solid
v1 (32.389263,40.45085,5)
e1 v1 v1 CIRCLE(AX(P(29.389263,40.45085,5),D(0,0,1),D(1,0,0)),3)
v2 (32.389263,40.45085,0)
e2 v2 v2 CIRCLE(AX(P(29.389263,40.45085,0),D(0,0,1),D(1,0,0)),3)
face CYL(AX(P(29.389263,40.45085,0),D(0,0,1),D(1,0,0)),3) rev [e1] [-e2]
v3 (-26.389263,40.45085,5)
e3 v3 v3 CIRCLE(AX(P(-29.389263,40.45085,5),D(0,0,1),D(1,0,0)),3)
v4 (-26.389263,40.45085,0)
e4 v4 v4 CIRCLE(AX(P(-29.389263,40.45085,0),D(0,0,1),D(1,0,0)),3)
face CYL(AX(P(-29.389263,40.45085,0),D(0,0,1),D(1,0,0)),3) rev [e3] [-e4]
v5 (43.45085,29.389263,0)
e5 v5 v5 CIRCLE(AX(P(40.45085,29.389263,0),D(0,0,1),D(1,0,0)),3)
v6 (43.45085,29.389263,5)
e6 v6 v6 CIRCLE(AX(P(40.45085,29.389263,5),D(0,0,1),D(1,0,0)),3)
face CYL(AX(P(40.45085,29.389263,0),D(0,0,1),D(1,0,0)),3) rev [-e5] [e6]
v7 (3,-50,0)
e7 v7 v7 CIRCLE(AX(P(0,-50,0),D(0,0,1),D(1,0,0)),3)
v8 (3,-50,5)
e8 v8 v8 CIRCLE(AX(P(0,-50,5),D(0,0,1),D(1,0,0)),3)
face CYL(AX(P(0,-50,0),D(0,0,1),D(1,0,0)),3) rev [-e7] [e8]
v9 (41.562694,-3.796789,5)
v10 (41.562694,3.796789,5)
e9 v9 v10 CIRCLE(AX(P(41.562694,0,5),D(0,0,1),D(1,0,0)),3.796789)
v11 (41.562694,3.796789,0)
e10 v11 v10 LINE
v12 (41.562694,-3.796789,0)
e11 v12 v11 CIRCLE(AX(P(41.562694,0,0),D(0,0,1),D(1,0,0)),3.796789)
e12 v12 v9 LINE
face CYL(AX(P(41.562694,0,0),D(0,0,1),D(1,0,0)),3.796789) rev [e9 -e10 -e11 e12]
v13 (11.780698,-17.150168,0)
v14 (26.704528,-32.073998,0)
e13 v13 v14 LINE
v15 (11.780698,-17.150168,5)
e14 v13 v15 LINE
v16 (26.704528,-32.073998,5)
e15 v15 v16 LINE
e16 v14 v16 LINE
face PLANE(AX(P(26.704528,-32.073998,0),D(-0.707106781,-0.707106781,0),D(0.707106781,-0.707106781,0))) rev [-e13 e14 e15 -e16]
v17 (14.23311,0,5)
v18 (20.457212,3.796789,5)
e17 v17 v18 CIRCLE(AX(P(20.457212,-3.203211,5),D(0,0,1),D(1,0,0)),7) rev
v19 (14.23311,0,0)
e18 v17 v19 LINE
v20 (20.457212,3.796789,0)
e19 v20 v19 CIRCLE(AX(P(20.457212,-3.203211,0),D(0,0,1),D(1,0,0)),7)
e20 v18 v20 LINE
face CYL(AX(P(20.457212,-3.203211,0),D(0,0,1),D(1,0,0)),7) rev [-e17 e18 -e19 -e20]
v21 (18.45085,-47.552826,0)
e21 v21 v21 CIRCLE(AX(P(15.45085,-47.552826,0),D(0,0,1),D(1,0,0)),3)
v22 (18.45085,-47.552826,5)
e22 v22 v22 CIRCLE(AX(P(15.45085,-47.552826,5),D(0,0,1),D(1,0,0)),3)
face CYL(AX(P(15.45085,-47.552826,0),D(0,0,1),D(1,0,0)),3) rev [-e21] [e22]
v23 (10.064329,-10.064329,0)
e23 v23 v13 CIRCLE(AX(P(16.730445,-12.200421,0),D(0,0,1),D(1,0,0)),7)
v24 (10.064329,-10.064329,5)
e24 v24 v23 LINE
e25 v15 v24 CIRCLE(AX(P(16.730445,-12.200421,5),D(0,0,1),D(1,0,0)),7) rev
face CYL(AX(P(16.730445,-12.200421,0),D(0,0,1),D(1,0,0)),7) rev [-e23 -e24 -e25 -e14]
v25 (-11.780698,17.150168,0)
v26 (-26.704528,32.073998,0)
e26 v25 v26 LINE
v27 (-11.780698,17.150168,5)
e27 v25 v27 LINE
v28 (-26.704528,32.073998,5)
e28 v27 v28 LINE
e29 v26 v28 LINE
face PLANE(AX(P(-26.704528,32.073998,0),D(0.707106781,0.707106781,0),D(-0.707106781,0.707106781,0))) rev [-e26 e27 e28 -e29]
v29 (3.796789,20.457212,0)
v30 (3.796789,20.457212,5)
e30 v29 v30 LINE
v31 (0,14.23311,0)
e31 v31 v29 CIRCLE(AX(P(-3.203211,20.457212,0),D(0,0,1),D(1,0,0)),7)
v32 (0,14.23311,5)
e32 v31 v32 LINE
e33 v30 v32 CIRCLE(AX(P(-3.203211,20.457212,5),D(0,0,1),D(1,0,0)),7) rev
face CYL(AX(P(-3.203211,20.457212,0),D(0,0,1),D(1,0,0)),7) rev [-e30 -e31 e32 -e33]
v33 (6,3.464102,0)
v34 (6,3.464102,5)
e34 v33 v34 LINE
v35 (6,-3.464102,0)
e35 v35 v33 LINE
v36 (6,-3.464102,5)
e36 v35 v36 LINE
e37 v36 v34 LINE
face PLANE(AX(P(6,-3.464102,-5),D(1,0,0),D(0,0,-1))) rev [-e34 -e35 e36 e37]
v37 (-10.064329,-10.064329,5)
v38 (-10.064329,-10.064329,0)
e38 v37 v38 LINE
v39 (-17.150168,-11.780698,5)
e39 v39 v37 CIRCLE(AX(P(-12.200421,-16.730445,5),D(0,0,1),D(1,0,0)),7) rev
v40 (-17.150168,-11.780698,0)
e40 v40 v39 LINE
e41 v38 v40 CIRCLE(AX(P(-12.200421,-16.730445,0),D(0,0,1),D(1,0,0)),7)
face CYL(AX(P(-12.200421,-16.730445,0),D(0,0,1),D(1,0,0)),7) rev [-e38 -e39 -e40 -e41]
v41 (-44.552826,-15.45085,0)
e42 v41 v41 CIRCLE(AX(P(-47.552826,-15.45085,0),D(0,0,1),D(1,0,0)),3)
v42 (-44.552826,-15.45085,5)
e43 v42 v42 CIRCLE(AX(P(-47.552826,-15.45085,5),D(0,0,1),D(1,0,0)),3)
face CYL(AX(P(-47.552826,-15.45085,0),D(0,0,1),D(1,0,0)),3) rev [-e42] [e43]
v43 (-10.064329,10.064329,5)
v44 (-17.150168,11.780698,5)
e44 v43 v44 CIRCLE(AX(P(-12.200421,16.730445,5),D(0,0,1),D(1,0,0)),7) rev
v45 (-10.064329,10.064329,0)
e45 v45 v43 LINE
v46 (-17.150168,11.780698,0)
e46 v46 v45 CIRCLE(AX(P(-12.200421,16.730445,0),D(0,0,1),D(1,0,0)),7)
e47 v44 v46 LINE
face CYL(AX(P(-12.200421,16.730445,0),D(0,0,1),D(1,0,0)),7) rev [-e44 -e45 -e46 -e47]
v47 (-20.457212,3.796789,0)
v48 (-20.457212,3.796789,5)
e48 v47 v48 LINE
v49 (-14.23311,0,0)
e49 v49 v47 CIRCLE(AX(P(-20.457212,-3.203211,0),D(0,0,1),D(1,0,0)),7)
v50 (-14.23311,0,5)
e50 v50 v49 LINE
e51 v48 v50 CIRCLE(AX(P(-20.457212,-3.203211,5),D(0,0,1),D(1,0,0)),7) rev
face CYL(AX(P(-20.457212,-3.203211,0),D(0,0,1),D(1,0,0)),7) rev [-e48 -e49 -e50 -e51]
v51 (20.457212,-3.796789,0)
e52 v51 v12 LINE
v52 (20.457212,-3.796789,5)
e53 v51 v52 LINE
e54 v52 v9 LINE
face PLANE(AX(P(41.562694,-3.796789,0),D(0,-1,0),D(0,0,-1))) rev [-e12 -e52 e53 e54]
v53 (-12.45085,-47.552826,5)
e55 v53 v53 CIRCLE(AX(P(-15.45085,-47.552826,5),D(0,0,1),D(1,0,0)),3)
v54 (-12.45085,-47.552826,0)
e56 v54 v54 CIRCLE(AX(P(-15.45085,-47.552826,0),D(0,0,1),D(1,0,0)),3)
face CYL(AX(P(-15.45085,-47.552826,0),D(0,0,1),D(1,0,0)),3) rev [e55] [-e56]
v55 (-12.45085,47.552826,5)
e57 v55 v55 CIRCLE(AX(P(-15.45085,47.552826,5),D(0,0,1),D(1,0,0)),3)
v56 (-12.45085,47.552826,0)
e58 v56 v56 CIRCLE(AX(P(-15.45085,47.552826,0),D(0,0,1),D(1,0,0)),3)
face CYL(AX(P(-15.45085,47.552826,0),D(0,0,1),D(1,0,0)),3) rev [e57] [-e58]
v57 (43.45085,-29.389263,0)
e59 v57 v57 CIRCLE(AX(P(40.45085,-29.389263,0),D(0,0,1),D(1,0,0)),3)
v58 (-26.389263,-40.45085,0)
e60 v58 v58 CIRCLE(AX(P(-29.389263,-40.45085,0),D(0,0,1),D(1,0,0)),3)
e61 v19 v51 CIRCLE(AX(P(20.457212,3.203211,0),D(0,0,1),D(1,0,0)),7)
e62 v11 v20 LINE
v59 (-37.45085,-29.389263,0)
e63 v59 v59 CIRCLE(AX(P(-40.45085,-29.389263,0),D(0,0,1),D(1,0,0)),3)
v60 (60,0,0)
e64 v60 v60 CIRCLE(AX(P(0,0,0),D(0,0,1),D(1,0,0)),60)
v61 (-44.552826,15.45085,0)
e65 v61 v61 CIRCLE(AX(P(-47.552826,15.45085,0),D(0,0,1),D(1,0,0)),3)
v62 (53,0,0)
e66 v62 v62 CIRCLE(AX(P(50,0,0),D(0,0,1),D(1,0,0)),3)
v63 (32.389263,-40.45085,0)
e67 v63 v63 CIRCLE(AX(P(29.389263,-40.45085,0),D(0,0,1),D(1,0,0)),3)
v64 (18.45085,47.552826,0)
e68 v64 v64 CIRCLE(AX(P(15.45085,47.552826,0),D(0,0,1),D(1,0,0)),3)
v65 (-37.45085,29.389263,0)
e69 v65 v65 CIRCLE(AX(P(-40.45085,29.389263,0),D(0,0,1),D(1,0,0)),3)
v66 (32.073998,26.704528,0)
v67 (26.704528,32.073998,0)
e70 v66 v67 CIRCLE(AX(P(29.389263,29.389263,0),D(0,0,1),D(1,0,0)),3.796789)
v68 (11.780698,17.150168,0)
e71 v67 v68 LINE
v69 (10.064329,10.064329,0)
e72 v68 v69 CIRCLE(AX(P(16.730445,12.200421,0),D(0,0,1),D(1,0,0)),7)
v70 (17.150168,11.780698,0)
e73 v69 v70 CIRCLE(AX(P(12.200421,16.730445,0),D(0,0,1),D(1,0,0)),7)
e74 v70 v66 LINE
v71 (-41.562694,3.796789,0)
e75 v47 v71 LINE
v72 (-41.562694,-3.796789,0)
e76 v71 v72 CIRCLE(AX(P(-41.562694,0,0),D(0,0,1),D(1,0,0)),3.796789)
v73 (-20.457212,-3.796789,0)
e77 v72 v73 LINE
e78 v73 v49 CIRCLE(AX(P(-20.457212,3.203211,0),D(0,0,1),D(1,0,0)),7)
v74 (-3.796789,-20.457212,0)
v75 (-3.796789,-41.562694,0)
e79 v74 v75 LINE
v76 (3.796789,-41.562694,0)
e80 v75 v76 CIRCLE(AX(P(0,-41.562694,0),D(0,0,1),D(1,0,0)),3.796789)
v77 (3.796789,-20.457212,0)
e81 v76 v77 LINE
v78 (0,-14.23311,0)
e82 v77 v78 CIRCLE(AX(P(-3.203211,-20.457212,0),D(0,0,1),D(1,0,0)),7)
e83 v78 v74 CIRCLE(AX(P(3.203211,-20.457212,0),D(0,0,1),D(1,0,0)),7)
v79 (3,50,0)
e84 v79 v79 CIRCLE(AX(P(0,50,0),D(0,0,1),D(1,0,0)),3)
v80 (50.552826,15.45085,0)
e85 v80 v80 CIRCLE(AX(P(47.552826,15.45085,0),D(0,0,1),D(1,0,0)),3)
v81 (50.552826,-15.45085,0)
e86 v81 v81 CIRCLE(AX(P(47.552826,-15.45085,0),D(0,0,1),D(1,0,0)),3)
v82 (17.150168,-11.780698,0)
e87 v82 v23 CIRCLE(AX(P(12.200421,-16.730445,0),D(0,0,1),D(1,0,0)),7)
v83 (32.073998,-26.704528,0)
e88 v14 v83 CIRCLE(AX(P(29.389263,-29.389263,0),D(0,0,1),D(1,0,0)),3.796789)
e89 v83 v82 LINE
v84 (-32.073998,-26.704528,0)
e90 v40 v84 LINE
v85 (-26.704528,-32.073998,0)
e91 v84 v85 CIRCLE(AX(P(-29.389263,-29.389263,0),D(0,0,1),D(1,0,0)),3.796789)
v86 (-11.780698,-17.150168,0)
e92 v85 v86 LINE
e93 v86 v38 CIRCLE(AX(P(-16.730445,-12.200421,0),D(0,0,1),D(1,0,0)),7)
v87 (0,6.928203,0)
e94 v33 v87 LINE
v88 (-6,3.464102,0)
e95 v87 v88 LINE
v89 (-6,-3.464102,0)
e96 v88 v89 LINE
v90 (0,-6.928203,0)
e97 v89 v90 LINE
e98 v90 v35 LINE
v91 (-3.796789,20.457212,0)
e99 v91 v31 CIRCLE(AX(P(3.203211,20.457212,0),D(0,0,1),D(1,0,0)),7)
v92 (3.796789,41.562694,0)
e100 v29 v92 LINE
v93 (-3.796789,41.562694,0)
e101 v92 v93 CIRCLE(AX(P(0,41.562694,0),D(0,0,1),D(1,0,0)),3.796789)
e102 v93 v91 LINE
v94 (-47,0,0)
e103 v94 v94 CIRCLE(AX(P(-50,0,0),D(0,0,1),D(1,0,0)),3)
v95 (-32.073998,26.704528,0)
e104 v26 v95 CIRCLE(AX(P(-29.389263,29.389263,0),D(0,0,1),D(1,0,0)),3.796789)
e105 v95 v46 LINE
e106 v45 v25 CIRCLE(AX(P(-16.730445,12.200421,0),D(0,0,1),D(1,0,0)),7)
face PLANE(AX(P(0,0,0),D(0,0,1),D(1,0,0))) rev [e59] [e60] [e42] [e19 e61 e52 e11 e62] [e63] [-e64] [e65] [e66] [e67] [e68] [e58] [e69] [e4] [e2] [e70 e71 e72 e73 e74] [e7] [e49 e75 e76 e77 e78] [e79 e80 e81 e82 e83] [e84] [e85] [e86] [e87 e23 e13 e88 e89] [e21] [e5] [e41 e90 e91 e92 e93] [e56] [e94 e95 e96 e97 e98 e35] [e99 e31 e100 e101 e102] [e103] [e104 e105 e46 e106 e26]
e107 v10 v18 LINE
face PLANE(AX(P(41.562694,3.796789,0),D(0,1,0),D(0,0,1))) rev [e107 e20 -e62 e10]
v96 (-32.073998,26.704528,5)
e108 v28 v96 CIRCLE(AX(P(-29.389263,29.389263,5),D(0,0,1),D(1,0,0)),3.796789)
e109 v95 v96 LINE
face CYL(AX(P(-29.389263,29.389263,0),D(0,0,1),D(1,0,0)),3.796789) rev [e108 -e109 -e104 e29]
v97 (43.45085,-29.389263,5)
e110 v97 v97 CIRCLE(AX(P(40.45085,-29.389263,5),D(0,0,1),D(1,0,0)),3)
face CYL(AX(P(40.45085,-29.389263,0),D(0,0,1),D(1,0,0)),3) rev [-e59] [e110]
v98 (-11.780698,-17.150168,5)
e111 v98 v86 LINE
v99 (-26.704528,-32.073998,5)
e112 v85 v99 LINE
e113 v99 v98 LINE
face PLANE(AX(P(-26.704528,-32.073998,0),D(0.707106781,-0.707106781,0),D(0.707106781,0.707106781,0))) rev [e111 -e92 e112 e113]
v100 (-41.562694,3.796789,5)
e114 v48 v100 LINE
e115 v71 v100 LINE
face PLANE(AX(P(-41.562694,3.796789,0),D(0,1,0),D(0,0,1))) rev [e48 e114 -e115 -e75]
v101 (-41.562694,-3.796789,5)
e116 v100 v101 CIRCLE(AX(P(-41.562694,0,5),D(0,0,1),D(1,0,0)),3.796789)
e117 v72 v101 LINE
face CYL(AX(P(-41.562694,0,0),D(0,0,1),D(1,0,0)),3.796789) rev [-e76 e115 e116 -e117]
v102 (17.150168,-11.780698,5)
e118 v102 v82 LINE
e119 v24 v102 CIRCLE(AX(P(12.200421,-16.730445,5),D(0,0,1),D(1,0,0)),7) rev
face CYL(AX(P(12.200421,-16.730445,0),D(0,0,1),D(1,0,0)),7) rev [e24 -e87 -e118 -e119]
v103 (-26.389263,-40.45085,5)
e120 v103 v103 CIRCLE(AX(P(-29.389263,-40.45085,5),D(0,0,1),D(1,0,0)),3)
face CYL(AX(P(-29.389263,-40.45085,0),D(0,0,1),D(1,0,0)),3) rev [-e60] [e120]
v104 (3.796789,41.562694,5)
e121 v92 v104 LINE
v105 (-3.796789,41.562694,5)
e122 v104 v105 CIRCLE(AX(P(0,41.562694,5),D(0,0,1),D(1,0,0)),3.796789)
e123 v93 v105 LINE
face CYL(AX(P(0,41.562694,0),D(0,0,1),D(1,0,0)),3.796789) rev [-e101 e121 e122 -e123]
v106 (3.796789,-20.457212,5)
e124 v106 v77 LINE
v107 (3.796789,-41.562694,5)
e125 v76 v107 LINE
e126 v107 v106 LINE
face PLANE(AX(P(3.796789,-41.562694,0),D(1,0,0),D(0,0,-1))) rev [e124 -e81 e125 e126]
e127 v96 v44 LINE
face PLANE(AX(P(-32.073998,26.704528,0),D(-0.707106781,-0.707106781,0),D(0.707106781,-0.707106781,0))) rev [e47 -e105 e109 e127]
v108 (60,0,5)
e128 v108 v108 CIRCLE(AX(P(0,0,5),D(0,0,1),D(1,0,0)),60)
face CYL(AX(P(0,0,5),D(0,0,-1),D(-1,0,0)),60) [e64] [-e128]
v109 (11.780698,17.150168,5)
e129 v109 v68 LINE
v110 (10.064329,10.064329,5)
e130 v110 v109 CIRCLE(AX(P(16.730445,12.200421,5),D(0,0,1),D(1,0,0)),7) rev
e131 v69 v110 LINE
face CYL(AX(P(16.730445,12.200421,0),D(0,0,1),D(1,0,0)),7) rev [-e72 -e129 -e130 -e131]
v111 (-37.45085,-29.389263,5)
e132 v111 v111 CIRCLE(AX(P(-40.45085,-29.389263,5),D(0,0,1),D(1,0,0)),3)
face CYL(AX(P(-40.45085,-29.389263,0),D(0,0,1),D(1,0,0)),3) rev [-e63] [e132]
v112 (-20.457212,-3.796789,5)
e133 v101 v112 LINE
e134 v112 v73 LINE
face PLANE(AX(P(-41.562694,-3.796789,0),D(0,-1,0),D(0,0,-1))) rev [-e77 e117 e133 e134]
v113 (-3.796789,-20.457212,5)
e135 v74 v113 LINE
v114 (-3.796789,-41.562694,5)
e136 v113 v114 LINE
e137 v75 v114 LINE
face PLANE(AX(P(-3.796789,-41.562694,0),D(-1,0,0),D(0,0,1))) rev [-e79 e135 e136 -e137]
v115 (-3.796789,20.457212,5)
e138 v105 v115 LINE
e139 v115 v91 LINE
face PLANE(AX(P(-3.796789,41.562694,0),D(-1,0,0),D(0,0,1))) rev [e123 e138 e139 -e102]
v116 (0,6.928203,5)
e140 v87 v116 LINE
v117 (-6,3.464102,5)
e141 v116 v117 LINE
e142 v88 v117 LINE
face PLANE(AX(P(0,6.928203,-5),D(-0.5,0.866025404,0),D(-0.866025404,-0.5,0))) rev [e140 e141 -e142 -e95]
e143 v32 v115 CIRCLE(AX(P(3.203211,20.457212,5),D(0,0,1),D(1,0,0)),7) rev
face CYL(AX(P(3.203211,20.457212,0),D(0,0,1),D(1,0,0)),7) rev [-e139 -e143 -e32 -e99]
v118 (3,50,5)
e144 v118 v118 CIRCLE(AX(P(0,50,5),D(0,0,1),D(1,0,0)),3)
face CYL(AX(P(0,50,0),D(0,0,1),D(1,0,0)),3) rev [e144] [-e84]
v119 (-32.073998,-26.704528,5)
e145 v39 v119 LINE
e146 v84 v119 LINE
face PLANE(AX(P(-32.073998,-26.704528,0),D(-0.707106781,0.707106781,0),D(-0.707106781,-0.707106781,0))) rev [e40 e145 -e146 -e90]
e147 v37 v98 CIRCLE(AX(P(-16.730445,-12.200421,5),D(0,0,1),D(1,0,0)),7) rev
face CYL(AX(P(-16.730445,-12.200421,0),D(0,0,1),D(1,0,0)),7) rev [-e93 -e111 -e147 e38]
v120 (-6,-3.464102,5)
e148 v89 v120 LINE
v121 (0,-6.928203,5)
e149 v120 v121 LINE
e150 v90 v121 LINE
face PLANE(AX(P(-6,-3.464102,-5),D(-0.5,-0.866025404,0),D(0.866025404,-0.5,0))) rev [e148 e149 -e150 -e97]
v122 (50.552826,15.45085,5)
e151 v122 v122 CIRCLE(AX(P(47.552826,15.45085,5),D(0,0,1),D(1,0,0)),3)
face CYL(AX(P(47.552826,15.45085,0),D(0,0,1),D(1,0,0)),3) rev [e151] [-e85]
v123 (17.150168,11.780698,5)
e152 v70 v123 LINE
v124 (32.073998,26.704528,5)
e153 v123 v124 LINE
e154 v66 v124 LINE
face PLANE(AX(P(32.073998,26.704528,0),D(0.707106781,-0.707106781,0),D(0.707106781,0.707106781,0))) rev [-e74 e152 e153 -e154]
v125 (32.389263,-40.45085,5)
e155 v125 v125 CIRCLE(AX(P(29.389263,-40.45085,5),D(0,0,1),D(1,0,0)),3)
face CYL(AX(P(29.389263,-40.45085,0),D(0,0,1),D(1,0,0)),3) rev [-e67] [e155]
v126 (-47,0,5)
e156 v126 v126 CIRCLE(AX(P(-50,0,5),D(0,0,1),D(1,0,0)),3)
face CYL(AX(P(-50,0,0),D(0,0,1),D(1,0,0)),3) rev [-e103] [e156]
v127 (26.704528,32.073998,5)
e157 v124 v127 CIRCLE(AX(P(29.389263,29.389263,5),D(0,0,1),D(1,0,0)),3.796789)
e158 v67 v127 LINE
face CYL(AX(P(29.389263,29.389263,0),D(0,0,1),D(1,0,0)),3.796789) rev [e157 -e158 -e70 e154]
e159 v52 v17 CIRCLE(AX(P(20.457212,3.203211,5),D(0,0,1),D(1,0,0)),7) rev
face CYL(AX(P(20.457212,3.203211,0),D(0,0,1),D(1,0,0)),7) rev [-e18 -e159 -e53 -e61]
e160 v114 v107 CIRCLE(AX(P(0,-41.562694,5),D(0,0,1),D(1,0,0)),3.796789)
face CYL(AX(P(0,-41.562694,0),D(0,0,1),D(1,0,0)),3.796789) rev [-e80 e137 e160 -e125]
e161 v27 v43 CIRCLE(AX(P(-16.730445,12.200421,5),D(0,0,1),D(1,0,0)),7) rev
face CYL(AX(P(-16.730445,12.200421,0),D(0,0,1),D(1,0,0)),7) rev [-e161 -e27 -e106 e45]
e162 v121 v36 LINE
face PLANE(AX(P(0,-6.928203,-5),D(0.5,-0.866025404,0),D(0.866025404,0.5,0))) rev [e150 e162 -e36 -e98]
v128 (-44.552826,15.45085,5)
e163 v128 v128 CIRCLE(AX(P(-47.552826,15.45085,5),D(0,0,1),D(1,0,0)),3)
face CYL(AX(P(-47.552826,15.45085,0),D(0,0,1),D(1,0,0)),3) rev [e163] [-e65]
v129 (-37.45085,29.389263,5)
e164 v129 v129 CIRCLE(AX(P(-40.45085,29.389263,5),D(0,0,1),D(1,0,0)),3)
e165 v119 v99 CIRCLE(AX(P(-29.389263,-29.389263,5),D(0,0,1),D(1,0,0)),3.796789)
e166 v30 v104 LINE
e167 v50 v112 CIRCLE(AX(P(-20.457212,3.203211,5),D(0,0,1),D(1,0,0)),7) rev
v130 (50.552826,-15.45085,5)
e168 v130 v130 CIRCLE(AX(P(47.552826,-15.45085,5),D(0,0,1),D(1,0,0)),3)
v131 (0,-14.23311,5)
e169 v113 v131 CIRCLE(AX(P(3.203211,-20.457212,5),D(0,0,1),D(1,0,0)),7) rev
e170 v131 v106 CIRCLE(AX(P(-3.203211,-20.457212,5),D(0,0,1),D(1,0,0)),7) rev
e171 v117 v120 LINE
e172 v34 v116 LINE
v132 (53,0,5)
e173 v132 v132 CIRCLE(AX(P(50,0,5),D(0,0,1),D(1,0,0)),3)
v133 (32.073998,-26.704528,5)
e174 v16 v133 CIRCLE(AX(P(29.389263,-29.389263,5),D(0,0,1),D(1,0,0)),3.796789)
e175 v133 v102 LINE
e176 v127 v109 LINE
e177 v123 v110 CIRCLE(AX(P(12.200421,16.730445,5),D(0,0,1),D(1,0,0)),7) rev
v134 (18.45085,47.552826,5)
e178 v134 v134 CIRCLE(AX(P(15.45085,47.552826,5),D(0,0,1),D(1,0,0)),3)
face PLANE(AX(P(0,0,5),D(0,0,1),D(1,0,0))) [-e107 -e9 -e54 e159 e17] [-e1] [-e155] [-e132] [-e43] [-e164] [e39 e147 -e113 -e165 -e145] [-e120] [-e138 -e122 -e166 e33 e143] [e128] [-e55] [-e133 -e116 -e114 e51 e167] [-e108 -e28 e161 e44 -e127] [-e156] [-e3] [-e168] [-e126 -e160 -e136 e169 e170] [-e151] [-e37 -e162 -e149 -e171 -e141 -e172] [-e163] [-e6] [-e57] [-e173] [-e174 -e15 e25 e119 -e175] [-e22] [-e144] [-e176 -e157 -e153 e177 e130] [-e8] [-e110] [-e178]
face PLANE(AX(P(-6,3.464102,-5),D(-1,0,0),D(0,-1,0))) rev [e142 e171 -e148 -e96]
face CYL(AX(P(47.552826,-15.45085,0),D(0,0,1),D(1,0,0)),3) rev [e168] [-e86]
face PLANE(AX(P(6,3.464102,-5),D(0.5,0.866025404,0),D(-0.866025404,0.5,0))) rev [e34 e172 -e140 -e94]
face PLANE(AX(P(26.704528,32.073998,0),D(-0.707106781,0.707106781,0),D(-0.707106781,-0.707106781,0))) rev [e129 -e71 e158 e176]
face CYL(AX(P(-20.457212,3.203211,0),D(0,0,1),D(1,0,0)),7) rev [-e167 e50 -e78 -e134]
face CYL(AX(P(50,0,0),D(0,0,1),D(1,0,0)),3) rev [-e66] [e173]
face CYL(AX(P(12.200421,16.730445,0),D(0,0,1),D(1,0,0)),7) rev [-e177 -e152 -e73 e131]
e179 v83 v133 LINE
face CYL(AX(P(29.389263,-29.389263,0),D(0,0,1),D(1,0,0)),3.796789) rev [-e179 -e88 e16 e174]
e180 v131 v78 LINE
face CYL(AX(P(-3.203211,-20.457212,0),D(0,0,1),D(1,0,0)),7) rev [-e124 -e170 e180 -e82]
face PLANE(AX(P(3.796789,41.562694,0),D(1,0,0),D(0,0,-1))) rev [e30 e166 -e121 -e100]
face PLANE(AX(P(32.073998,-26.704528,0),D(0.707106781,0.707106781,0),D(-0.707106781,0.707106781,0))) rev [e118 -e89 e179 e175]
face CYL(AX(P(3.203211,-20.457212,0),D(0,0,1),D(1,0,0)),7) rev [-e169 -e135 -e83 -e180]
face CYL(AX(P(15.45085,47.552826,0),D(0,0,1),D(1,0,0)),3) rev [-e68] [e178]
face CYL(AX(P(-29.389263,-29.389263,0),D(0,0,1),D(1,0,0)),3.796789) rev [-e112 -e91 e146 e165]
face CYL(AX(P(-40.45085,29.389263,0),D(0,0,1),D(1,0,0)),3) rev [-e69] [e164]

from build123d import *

# Parameters (mm, degrees)
SKETCH1_R           = 60
BOSS_EXTRUDE1_DEPTH = 5
SKETCH2_R           = 2
SKETCH2_R_2         = 3
CUT_EXTRUDE2_DEPTH  = 5
FILLET1_R           = 7
CUT_EXTRUDE3_DEPTH  = 10


with BuildPart() as part:
    # Sketch1 → Boss-Extrude1 (new body)
    with BuildSketch(Plane.XY):
        Circle(SKETCH1_R)
    extrude(amount=BOSS_EXTRUDE1_DEPTH)

    # Sketch2 → Cut-Extrude2 (cut)
    with BuildSketch(Plane.XY.offset(5)):
        Circle(SKETCH2_R)
        with Locations((0, 50)):
            Circle(SKETCH2_R_2)
        with Locations((15.450849719, 47.552825815)):
            Circle(SKETCH2_R_2)
        with Locations((29.389262615, 40.450849719)):
            Circle(SKETCH2_R_2)
        with Locations((40.450849719, 29.389262615)):
            Circle(SKETCH2_R_2)
        with Locations((47.552825815, 15.450849719)):
            Circle(SKETCH2_R_2)
        with Locations((50, 0)):
            Circle(SKETCH2_R_2)
        with Locations((47.552825815, -15.450849719)):
            Circle(SKETCH2_R_2)
        with Locations((40.450849719, -29.389262615)):
            Circle(SKETCH2_R_2)
        with Locations((29.389262615, -40.450849719)):
            Circle(SKETCH2_R_2)
        with Locations((15.450849719, -47.552825815)):
            Circle(SKETCH2_R_2)
        with Locations((0, -50)):
            Circle(SKETCH2_R_2)
        with Locations((-15.450849719, -47.552825815)):
            Circle(SKETCH2_R_2)
        with Locations((-29.389262615, -40.450849719)):
            Circle(SKETCH2_R_2)
        with Locations((-40.450849719, -29.389262615)):
            Circle(SKETCH2_R_2)
        with Locations((-47.552825815, -15.450849719)):
            Circle(SKETCH2_R_2)
        with Locations((-50, 0)):
            Circle(SKETCH2_R_2)
        with Locations((-47.552825815, 15.450849719)):
            Circle(SKETCH2_R_2)
        with Locations((-40.450849719, 29.389262615)):
            Circle(SKETCH2_R_2)
        with Locations((-29.389262615, 40.450849719)):
            Circle(SKETCH2_R_2)
        with Locations((-15.450849719, 47.552825815)):
            Circle(SKETCH2_R_2)
        with BuildLine():
            Line((-26.704527531, 32.073997698), (-6.627939737, 11.997409903))
            ThreePointArc((-6.627939737, 11.997409903), (-9.691940712, 9.691940712), (-11.997409903, 6.627939737))
            Line((-11.997409903, 6.627939737), (-32.073997698, 26.704527531))
            ThreePointArc((-32.073997698, 26.704527531), (-32.073997698, 32.073997698), (-26.704527531, 32.073997698))
        make_face()
        with BuildLine():
            Line((3.796788766, 41.562693778), (3.796788766, 13.170111032))
            ThreePointArc((3.796788766, 13.170111032), (0, 13.706474001), (-3.796788766, 13.170111032))
            Line((-3.796788766, 13.170111032), (-3.796788766, 41.562693778))
            ThreePointArc((-3.796788766, 41.562693778), (0, 45.359482544), (3.796788766, 41.562693778))
        make_face()
        with BuildLine():
            Line((32.073997698, 26.704527531), (11.997409903, 6.627939737))
            ThreePointArc((11.997409903, 6.627939737), (9.691940712, 9.691940712), (6.627939737, 11.997409903))
            Line((6.627939737, 11.997409903), (26.704527531, 32.073997698))
            ThreePointArc((26.704527531, 32.073997698), (32.073997698, 32.073997698), (32.073997698, 26.704527531))
        make_face()
        with BuildLine():
            Line((41.562693778, -3.796788766), (13.170111032, -3.796788766))
            ThreePointArc((13.170111032, -3.796788766), (13.706474001, 0), (13.170111032, 3.796788766))
            Line((13.170111032, 3.796788766), (41.562693778, 3.796788766))
            ThreePointArc((41.562693778, 3.796788766), (45.359482544, 0), (41.562693778, -3.796788766))
        make_face()
        with BuildLine():
            Line((26.704527531, -32.073997698), (6.627939737, -11.997409903))
            ThreePointArc((6.627939737, -11.997409903), (9.691940712, -9.691940712), (11.997409903, -6.627939737))
            Line((11.997409903, -6.627939737), (32.073997698, -26.704527531))
            ThreePointArc((32.073997698, -26.704527531), (32.073997698, -32.073997698), (26.704527531, -32.073997698))
        make_face()
        with BuildLine():
            Line((-3.796788766, -41.562693778), (-3.796788766, -13.170111032))
            ThreePointArc((-3.796788766, -13.170111032), (0, -13.706474001), (3.796788766, -13.170111032))
            Line((3.796788766, -13.170111032), (3.796788766, -41.562693778))
            ThreePointArc((3.796788766, -41.562693778), (0, -45.359482544), (-3.796788766, -41.562693778))
        make_face()
        with BuildLine():
            Line((-32.073997698, -26.704527531), (-11.997409903, -6.627939737))
            ThreePointArc((-11.997409903, -6.627939737), (-9.691940712, -9.691940712), (-6.627939737, -11.997409903))
            Line((-6.627939737, -11.997409903), (-26.704527531, -32.073997698))
            ThreePointArc((-26.704527531, -32.073997698), (-32.073997698, -32.073997698), (-32.073997698, -26.704527531))
        make_face()
        with BuildLine():
            Line((-41.562693778, 3.796788766), (-13.170111032, 3.796788766))
            ThreePointArc((-13.170111032, 3.796788766), (-13.706474001, 0), (-13.170111032, -3.796788766))
            Line((-13.170111032, -3.796788766), (-41.562693778, -3.796788766))
            ThreePointArc((-41.562693778, -3.796788766), (-45.359482544, 0), (-41.562693778, 3.796788766))
        make_face()
    extrude(amount=-CUT_EXTRUDE2_DEPTH, mode=Mode.SUBTRACT)

    # Fillet1
    # the kernel refuses this fillet: 7 mm, written as the material it adds along each edge
    with BuildSketch(Plane(origin=(11.997409903, 6.627939737, 5), x_dir=(-0.6614265480473352, 0.7500099476261538, 0), z_dir=(0, 0, -1)), Plane(origin=(13.170111032, -3.796788766, 5), x_dir=(0.06263792254265388, 0.9980363173049068, 0), z_dir=(0, 0, -1)), Plane(origin=(6.627939737, -11.997409903, 5), x_dir=(0.7500099476260863, 0.661426548047412, 0), z_dir=(0, 0, -1)), Plane(origin=(-3.796788766, -13.170111032, 5), x_dir=(0.998036317304904, -0.06263792254269633, 0), z_dir=(0, 0, -1)), Plane(origin=(-11.997409903, -6.627939737, 5), x_dir=(0.6614265480472753, -0.7500099476262067, 0), z_dir=(0, 0, -1)), Plane(origin=(-13.170111032, 3.796788766, 5), x_dir=(-0.06263792254277421, -0.9980363173048992, 0), z_dir=(0, 0, -1)), Plane(origin=(-6.627939737, 11.997409903, 5), x_dir=(-0.7500099476261984, -0.6614265480472847, 0), z_dir=(0, 0, -1)), Plane(origin=(3.796788766, 13.170111032, 5), x_dir=(-0.9980363173048974, 0.06263792254280169, 0), z_dir=(0, 0, -1))) as fillet1_piece_1:
        with BuildLine():
            CenterArc((7.442703057, 6.834325481), FILLET1_R, 176.408760408, 81.100827227)
            Line((0.456448836, 7.272790939), (0, 0))
            ThreePointArc((0, 0), (2.964384683, 0.324401927), (5.928769366, 0))
        make_face()
    extrude(amount=5)
    with BuildSketch(Plane(origin=(6.627939737, 11.997409903, 5), x_dir=(0.7071067811865476, 0.7071067811865476, 0), z_dir=(0, 0, -1)), Plane(origin=(13.170111032, 3.796788766, 5), x_dir=(1, 0, 0), z_dir=(0, 0, -1)), Plane(origin=(-6.627939737, -11.997409903, 5), x_dir=(-0.7071067811865477, -0.7071067811865474, 0), z_dir=(0, 0, -1)), Plane(origin=(-13.170111032, -3.796788766, 5), x_dir=(-1, 0, 0), z_dir=(0, 0, -1)), Plane(origin=(-3.796788766, 13.170111032, 5), x_dir=(0, 1, 0), z_dir=(0, 0, -1))) as fillet1_piece_2:
        with BuildLine():
            CenterArc((7.287100492, 7), FILLET1_R, 188.899172773, 81.100827227)
            ThreePointArc((0.371365796, 5.917127144), (0.509447803, 2.938243709), (0, 0))
            Line((0, 0), (7.287100492, 0))
        make_face()
    extrude(amount=5)
    with BuildSketch(Plane(origin=(11.997409903, -6.627939737, 5), x_dir=(-0.661426548047024, -0.7500099476264284, 0), z_dir=(0, 0, -1)), Plane(origin=(3.796788766, -13.170111032, 5), x_dir=(-0.9980363173048815, -0.06263792254305393, 0), z_dir=(0, 0, -1)), Plane(origin=(-11.997409903, 6.627939737, 5), x_dir=(0.6614265480472289, 0.7500099476262477, 0), z_dir=(0, 0, -1))) as fillet1_piece_3:
        with BuildLine():
            CenterArc((7.442703057, -6.834325481), FILLET1_R, 102.490412365, 81.100827227)
            Line((0.456448836, -7.272790939), (0, 0))
            ThreePointArc((0, 0), (2.964384683, -0.324401927), (5.928769366, 0))
        make_face()
    extrude(amount=5)

    # Sketch3 → Cut-Extrude3 (cut)
    with BuildSketch(Plane.XY.offset(5)):
        Polygon((0, 6.92820323), (-6, 3.464101615), (-6, -3.464101615), (0, -6.92820323), (6, -3.464101615), (6, 3.464101615), align=None)
    extrude(amount=-CUT_EXTRUDE3_DEPTH, mode=Mode.SUBTRACT)


solid = part.part
